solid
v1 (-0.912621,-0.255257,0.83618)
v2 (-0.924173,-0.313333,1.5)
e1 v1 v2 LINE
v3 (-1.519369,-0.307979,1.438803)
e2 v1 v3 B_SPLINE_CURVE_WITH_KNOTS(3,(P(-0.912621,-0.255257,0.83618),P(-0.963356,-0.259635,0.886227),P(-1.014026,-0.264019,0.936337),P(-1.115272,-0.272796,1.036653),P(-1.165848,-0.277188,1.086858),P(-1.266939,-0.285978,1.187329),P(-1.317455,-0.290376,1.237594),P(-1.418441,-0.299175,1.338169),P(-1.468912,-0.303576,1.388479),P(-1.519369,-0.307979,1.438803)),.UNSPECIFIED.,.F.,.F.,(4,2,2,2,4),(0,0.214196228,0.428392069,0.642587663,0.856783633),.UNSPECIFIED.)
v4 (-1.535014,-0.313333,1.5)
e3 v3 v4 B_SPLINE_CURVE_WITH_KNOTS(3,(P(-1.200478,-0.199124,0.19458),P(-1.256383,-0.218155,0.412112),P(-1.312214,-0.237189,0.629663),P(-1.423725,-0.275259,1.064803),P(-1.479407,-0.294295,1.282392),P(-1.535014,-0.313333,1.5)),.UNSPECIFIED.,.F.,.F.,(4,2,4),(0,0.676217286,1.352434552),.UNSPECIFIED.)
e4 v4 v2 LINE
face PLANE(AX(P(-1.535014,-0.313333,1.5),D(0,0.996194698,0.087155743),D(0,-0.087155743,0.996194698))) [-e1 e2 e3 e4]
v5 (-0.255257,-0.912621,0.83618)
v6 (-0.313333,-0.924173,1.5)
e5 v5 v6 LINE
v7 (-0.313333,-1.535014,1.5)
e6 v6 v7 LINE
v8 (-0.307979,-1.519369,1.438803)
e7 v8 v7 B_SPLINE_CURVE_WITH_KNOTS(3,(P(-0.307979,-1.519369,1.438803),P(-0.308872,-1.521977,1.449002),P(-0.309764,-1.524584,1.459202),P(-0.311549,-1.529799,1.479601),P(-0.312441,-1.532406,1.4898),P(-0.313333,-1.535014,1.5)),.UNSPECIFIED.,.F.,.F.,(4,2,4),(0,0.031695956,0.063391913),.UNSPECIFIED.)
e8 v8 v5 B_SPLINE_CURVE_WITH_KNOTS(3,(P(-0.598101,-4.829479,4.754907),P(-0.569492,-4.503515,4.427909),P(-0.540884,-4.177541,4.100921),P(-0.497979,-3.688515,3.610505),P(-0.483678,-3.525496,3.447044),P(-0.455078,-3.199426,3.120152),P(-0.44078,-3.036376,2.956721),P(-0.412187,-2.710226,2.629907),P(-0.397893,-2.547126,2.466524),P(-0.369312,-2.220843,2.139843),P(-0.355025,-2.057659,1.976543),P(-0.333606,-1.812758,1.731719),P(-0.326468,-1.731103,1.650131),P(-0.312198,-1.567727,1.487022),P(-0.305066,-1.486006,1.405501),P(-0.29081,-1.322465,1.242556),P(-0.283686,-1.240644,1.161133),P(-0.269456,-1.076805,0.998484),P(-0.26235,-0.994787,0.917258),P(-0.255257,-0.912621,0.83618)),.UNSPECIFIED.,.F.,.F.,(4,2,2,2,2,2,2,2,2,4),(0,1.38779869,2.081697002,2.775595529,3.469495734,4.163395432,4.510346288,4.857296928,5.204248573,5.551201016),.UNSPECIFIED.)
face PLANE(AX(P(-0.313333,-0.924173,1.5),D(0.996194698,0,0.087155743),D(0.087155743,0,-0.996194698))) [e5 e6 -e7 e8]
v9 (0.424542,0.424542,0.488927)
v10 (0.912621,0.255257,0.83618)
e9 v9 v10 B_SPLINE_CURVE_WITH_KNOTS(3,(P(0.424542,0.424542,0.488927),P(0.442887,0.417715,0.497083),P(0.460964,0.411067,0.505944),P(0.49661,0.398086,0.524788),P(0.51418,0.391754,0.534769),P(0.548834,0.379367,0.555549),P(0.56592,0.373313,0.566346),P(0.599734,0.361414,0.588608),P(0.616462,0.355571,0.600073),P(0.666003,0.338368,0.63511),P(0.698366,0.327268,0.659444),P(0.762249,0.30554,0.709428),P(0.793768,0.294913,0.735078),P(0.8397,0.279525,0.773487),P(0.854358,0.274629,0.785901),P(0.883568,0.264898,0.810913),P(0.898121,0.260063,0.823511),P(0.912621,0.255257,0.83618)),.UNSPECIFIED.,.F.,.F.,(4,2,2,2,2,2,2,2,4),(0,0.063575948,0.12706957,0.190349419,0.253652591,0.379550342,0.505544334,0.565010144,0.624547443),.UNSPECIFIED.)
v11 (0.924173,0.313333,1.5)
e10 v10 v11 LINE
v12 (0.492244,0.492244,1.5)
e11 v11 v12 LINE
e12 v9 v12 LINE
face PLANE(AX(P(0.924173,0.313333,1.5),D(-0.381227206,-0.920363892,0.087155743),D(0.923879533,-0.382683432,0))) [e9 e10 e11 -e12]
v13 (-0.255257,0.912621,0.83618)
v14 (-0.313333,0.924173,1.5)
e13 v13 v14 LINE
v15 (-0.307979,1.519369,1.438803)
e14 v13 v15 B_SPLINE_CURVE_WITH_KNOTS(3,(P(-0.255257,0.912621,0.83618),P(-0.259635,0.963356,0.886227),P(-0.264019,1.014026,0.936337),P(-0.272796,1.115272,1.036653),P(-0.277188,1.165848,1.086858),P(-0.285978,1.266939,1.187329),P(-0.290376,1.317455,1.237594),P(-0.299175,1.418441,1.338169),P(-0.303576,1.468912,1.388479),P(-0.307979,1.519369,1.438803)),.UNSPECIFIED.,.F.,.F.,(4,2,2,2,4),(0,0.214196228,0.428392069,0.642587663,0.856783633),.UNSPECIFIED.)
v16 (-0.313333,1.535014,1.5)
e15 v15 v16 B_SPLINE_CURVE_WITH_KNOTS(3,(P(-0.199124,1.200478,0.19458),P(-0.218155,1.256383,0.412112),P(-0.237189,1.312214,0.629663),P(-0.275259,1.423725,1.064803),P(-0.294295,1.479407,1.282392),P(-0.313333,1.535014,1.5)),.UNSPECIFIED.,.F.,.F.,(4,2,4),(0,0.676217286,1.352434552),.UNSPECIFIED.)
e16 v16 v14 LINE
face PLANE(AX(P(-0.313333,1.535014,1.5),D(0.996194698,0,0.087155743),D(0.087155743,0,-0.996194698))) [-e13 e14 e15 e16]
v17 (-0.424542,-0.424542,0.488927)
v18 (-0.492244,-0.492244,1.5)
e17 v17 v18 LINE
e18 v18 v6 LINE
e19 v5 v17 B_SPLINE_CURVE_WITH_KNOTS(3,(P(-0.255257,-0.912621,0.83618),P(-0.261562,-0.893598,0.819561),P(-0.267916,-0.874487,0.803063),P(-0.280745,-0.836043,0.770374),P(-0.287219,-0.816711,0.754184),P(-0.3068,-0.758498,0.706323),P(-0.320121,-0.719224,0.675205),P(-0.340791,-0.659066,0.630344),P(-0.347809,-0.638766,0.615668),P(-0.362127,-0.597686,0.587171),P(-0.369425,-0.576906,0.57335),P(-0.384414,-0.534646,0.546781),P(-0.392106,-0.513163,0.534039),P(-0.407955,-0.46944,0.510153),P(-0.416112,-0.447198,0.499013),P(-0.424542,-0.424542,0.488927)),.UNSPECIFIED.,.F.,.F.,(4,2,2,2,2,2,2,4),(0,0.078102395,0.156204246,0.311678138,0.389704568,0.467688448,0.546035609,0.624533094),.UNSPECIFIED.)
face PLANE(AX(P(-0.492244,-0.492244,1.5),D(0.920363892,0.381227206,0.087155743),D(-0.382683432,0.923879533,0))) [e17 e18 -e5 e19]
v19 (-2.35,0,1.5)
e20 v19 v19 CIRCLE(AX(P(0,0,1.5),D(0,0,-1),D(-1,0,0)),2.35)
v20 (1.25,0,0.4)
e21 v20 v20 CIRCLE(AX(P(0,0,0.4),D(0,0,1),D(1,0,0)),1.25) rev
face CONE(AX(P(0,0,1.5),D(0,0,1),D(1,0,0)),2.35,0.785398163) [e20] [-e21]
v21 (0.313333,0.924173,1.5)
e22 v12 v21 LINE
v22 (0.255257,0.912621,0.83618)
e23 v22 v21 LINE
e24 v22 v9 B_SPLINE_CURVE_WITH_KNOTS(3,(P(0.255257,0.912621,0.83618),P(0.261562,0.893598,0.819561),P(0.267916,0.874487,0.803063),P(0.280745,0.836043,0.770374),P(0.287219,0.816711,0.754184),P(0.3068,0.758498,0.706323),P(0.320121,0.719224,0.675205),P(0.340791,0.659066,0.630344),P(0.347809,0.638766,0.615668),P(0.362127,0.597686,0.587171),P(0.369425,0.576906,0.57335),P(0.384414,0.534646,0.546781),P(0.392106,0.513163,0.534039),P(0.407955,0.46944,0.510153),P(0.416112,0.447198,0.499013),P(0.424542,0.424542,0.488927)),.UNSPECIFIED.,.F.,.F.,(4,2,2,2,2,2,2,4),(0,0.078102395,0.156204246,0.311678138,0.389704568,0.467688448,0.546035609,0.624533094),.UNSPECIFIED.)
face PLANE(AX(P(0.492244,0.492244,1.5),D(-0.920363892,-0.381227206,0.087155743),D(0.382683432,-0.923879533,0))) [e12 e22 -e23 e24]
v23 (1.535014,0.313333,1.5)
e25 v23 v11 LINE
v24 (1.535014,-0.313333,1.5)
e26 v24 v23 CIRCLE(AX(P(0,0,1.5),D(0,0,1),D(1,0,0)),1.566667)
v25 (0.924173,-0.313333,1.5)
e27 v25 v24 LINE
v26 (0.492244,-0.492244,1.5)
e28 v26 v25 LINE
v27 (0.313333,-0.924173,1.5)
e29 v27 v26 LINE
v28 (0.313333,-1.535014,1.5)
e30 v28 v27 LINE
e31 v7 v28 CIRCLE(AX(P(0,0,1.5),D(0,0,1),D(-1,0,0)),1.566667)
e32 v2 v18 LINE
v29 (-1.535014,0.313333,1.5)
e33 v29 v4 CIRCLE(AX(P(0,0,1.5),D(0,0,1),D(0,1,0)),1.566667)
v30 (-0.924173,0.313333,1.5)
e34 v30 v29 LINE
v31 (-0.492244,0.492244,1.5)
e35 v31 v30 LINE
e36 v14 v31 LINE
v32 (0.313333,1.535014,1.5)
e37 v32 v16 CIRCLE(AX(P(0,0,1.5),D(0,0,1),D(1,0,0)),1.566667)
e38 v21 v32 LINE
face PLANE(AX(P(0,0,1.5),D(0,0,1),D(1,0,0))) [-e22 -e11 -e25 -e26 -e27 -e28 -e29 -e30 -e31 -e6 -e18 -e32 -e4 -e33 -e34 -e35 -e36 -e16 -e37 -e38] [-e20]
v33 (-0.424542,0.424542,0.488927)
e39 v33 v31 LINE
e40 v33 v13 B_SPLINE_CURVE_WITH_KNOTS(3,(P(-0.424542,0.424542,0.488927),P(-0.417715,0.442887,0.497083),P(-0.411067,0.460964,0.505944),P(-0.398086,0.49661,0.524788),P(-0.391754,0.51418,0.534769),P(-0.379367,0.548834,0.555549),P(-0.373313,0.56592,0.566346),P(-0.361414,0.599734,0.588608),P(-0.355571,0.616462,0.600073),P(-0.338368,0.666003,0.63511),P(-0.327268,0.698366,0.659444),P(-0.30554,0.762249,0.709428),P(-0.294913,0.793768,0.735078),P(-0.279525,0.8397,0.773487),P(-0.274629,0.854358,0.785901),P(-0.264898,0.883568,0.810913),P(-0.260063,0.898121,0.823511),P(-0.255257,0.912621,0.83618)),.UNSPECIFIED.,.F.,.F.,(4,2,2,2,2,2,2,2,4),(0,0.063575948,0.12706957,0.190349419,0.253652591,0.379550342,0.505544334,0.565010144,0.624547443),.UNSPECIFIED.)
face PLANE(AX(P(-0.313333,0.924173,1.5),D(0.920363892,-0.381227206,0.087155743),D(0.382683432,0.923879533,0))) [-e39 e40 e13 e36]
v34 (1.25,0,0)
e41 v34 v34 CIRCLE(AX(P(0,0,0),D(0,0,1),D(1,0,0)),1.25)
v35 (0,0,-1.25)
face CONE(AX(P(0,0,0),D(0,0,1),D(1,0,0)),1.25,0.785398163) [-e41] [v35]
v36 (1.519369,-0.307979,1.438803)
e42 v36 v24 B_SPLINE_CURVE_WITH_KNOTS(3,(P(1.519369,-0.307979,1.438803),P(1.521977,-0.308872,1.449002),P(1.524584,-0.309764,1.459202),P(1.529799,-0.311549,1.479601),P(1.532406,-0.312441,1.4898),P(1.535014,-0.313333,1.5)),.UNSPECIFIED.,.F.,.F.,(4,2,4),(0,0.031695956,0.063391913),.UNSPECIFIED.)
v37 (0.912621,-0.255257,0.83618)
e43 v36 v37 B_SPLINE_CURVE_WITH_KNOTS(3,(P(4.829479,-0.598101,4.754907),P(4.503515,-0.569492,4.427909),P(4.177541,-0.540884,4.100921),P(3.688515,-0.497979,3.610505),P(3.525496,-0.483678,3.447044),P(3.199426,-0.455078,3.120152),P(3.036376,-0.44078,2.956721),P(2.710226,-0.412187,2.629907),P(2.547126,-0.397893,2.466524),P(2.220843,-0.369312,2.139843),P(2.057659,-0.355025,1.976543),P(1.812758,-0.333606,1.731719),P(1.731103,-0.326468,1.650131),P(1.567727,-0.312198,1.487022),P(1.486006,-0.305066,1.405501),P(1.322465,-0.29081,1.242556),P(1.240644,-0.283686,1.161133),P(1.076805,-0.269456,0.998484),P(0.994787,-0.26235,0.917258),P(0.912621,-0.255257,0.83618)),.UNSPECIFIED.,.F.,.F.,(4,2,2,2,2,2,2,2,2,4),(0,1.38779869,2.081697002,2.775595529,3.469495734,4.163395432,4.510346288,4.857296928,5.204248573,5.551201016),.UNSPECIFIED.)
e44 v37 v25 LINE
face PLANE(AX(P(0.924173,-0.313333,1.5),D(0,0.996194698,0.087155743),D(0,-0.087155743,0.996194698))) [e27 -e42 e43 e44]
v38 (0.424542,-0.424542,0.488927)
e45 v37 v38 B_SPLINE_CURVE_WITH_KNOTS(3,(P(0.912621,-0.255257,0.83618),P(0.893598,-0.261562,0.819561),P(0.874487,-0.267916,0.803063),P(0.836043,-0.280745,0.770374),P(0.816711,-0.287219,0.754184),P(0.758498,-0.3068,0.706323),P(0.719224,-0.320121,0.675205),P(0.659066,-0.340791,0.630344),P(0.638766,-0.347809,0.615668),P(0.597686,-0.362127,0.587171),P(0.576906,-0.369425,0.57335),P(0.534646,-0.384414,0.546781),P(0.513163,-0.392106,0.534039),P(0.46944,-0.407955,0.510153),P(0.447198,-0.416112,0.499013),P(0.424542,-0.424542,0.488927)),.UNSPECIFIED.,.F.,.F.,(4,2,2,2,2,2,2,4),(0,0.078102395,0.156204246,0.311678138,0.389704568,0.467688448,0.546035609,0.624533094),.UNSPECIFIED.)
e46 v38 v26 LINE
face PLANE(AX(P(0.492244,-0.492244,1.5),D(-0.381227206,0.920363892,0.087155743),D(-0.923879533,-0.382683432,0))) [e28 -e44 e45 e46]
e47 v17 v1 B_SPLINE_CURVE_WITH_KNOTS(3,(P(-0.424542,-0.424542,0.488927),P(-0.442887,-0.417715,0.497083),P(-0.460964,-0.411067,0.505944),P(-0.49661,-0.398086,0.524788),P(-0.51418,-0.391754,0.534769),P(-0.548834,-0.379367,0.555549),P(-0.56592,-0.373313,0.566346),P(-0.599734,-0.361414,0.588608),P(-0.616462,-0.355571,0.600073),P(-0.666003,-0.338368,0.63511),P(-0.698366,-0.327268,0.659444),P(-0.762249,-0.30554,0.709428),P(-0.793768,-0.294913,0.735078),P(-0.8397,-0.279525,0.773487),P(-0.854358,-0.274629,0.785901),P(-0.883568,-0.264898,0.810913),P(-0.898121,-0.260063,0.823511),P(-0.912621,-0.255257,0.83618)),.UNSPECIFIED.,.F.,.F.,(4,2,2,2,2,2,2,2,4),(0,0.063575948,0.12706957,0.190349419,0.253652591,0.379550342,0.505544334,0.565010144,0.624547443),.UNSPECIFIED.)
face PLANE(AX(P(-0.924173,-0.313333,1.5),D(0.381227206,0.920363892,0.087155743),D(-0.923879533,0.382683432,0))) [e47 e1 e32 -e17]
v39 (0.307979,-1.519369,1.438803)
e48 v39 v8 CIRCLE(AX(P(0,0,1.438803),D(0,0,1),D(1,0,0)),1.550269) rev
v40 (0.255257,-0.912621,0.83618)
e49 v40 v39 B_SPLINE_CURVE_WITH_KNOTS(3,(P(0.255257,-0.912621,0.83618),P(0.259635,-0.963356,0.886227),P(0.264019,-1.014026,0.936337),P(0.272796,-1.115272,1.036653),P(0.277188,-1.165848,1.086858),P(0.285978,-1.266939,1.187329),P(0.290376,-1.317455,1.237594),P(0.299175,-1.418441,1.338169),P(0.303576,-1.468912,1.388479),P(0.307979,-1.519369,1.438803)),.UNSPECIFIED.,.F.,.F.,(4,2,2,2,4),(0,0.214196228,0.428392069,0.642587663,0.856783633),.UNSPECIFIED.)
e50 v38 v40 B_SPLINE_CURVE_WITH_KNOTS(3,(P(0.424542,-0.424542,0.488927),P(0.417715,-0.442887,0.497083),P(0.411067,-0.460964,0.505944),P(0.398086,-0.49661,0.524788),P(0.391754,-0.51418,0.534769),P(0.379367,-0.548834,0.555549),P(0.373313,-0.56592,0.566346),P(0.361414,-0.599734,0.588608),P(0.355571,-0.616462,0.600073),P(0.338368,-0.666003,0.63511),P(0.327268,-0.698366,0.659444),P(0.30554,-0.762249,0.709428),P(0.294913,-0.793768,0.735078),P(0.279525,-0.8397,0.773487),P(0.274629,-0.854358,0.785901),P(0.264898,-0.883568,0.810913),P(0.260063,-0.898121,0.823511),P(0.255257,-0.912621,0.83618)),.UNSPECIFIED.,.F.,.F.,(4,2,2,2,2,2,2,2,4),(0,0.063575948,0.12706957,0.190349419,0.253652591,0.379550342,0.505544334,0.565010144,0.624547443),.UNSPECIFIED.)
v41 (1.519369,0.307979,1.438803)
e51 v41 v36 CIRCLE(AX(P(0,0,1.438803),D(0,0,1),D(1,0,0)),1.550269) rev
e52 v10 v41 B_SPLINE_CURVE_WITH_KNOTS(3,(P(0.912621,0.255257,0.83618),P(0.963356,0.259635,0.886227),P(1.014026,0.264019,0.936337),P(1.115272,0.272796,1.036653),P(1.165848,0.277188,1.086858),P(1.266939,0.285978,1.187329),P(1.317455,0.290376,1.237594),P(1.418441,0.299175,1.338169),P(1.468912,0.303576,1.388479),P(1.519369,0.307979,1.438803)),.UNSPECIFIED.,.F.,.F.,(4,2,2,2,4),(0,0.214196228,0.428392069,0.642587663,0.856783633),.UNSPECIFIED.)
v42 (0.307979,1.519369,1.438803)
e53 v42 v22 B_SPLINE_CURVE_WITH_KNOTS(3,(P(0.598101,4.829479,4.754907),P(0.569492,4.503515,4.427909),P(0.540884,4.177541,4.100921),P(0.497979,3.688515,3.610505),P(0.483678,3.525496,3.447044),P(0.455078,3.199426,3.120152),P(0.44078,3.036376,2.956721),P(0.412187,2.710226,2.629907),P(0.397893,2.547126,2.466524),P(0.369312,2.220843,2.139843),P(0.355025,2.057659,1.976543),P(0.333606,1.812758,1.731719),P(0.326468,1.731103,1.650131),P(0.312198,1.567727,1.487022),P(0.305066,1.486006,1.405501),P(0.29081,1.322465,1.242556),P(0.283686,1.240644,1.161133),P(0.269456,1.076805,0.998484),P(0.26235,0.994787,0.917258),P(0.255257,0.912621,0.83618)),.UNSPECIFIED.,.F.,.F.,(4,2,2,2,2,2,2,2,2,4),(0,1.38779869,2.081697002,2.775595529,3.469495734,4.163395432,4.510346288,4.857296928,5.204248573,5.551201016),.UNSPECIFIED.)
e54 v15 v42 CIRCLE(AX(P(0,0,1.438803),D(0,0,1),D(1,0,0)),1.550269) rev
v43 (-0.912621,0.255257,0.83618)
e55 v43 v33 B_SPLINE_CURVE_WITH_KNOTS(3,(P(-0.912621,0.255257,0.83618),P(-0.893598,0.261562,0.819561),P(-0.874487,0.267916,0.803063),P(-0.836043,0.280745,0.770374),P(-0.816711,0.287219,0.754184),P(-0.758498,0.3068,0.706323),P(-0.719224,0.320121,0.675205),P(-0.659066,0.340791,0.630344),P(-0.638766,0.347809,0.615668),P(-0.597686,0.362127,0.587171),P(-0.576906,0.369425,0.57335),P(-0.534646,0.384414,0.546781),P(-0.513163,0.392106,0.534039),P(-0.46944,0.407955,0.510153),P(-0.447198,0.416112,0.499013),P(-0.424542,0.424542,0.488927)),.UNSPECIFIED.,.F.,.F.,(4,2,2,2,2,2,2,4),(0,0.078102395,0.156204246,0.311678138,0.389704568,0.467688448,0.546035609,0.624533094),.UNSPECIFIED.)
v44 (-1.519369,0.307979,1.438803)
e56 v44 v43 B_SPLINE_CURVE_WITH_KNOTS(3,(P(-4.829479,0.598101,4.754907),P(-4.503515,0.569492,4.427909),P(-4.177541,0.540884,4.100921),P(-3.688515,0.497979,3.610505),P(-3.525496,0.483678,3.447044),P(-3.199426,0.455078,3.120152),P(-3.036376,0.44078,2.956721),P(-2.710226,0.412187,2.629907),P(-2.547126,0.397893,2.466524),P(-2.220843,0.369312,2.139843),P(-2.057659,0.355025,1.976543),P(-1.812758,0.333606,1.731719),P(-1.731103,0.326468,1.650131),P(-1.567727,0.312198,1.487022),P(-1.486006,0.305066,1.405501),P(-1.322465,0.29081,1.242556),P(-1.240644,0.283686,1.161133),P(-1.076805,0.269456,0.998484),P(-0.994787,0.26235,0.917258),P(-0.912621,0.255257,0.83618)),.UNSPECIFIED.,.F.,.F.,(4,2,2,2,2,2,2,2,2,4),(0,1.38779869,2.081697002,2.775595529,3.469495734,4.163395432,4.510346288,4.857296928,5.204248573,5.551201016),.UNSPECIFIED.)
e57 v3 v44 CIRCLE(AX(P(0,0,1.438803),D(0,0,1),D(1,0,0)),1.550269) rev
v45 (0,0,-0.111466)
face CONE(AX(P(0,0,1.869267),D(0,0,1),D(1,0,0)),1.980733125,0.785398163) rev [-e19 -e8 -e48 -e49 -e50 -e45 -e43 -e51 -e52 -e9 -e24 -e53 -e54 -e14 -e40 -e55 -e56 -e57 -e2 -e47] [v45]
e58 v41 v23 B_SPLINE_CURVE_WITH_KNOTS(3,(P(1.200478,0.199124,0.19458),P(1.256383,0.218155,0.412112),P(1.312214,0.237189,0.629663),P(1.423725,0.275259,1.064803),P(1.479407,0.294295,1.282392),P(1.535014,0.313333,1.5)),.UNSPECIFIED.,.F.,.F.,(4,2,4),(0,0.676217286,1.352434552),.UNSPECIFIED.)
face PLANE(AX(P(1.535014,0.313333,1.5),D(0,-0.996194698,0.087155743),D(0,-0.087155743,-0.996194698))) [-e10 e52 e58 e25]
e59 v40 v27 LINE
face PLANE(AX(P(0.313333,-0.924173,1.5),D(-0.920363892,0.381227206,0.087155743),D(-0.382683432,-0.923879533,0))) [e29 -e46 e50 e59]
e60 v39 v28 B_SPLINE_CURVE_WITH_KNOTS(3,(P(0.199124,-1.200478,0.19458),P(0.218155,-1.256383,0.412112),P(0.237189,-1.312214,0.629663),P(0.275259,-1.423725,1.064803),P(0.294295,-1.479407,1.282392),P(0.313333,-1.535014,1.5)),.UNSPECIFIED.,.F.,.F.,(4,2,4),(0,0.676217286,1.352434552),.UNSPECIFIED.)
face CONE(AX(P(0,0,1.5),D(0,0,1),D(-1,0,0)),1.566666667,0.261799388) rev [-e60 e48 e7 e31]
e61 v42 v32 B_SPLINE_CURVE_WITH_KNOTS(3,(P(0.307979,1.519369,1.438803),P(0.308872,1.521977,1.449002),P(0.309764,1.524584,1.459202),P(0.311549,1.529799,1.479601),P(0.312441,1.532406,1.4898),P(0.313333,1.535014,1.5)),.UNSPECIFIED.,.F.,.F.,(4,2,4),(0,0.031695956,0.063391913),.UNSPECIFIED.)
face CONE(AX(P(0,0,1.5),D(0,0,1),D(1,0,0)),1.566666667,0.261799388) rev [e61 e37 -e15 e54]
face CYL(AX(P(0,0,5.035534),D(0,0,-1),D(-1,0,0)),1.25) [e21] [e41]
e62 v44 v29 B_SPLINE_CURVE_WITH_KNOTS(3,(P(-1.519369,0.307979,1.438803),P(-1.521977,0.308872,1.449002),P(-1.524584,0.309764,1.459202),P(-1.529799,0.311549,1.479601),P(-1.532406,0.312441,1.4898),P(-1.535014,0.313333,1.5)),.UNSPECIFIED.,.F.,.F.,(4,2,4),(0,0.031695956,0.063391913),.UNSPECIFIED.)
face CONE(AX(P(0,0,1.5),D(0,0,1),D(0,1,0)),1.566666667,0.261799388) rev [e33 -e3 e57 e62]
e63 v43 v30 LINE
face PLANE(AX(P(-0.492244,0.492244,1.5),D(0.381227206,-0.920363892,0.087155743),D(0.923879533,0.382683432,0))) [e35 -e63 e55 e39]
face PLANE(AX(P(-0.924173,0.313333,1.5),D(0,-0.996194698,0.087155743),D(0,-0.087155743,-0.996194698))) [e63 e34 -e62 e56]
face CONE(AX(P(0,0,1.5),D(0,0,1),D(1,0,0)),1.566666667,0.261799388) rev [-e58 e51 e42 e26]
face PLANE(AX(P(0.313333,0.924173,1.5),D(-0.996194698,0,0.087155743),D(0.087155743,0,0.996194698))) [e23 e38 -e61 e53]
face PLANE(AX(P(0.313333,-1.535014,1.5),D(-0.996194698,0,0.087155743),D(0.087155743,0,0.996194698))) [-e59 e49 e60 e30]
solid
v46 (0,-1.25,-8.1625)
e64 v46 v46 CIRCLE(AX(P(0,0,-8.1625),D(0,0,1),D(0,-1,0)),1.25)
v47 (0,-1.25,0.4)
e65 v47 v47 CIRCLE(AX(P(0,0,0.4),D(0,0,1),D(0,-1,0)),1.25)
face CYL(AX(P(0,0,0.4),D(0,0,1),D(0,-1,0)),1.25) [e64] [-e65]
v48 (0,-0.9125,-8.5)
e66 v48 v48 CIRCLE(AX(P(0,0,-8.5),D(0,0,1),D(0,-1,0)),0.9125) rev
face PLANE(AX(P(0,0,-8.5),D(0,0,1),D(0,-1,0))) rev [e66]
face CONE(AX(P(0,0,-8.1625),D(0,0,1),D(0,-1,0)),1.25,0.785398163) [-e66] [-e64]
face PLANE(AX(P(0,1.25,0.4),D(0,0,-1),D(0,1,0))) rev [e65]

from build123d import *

# Parameters (mm, degrees)
SKETCH1_R          = 2.35
EXTRUDE3_DEPTH     = 1.5
SKETCH4_W          = 8.9
SKETCH4_H          = 1.25
CHAMFER1_SIZE      = 0.3375
CUT_EXTRUDE3_REACH = 12.538
CIRPATTERN1_COUNT  = 4
DRAFT2_ANGLE       = 5


# Read off the part's stored shape, not the designer's step: Extrude10, Draft1
with BuildPart() as part:
    # Sketch1 → Extrude3 (new body)
    with BuildSketch(Plane.XY):
        Circle(SKETCH1_R)
    extrude(amount=EXTRUDE3_DEPTH)

    # Sketch11 → Cut-Revolve3 (revolve, cut)
    with BuildSketch(Plane(origin=(0, 0, 0), x_dir=(0, 0, -1), z_dir=(1, 0, 0)), mode=Mode.PRIVATE) as cut_revolve3_sk:
        Polygon((0, 0.85), (-1.5, 2.35), (0, 2.35), align=None)
    revolve(cut_revolve3_sk.sketch.rotate(Axis((0, 0, -0.441444004), (0, 0, 1)), 90), axis=Axis((0, 0, -0.441444004), (0, 0, 1)), mode=Mode.SUBTRACT)

    # Extrude10 outline → Extrude10 (revolve)
    with BuildSketch(Plane.XZ):
        Polygon((1.25, 0), (1.25, 0.4), (0.85, 0.4), (0.85, 0), (0, 0), (0, -1.25), align=None)
    revolve(axis=Axis((0, 0, 0), (0, 0, 1)))

    # Cut-Extrude3: up to this cone (the profile starts inside it)
    cut_extrude3_end = Plane(origin=(0, 0, 1.5), z_dir=(0, 0, 1)).offset(-1.611465251) * Cone(1e-06, 16.260932502, 16.260931502, align=(Align.CENTER, Align.CENTER, Align.MIN), mode=Mode.PRIVATE)
    # Sketch12 → Cut-Extrude3 (cut, up to the surface)
    with BuildSketch(Plane.XY.offset(1.5), mode=Mode.PRIVATE) as cut_extrude3_sk1:
        with BuildLine():
            Line((1.535013572, 0.313333333), (0.924173453, 0.313333333))
            Line((0.924173453, 0.313333333), (0.492244262, 0.492244262))
            Line((0.492244262, 0.492244262), (0.313333333, 0.924173453))
            Line((0.313333333, 0.924173453), (0.313333333, 1.535013572))
            ThreePointArc((0.313333333, 1.535013572), (0.15746404, 1.558733306), (0, 1.566666667))
            Line((0, 1.566666667), (0, 0))
            Line((0, 0), (1.566666667, 0))
            ThreePointArc((1.566666667, 0), (1.558733306, 0.15746404), (1.535013572, 0.313333333))
        make_face()
    cut_extrude3_tool1 = extrude(cut_extrude3_sk1.sketch, amount=-CUT_EXTRUDE3_REACH, mode=Mode.PRIVATE) & cut_extrude3_end
    cut_extrude3 = cut_extrude3_tool1.solids().sort_by_distance((1.229594, 0.291177, 1.5))[0]
    add(cut_extrude3, mode=Mode.SUBTRACT)

    # CirPattern1: Cut-Extrude3 ×4 about axis
    cirpattern1_axis = Axis((0, 0, 0), (0, 0, 1))
    for i in range(1, CIRPATTERN1_COUNT):
        add(cut_extrude3.rotate(cirpattern1_axis, i * 360 / CIRPATTERN1_COUNT), mode=Mode.SUBTRACT)

    # Draft1 outline → Draft1 (revolve)
    with BuildSketch(Plane.XZ):
        Polygon((1.566666667, 1.5), (1.550268881, 1.43880263), (1.566666667, 1.43880263), align=None)
    revolve(axis=Axis((0, 0, 0), (0, 0, 1)))

    # Draft2
    draft2_faces = [part.faces().sort_by_distance(p)[0] for p in [
        (0.313333333, 1.140840621, 1.286158691),
        (0.408124508, 0.695327313, 1.100915441),
        (0.695327313, 0.408124508, 1.100915441),
        (1.140840621, 0.313333333, 1.286158691),
        (1.140840621, -0.313333333, 1.286158691),
        (0.695327313, -0.408124508, 1.100915441),
        (0.408124508, -0.695327313, 1.100915441),
        (0.313333333, -1.140840621, 1.286158691),
        (-0.313333333, -1.140840621, 1.286158691),
        (-0.408124508, -0.695327313, 1.100915441),
        (-0.695327313, -0.408124508, 1.100915441),
        (-1.140840621, -0.313333333, 1.286158691),
        (-1.140840621, 0.313333333, 1.286158691),
        (-0.695327313, 0.408124508, 1.100915441),
        (-0.408124508, 0.695327313, 1.100915441),
        (-0.313333333, 1.140840621, 1.286158691),
    ]]
    draft(draft2_faces, Plane.XY.offset(1.5), DRAFT2_ANGLE)


with BuildPart() as body_2:
    # Sketch4 → Revolve1 (revolve)
    with BuildSketch(Plane(origin=(0, 0, 0), x_dir=(0, 0, -1), z_dir=(1, 0, 0)), mode=Mode.PRIVATE) as revolve1_sk:
        with Locations((4.05, 0.625)):
            Rectangle(SKETCH4_W, SKETCH4_H)
    revolve(revolve1_sk.sketch.rotate(Axis((0, 0, 0.4), (0, 0, -1)), 180), axis=Axis((0, 0, 0.4), (0, 0, -1)))

    # Chamfer1
    chamfer1_edges = [body_2.edges().sort_by_distance(p)[0] for p in [
        (0, 1.25, -8.5),
    ]]
    chamfer(chamfer1_edges, length=CHAMFER1_SIZE)


solid = Compound([part.part, body_2.part])
